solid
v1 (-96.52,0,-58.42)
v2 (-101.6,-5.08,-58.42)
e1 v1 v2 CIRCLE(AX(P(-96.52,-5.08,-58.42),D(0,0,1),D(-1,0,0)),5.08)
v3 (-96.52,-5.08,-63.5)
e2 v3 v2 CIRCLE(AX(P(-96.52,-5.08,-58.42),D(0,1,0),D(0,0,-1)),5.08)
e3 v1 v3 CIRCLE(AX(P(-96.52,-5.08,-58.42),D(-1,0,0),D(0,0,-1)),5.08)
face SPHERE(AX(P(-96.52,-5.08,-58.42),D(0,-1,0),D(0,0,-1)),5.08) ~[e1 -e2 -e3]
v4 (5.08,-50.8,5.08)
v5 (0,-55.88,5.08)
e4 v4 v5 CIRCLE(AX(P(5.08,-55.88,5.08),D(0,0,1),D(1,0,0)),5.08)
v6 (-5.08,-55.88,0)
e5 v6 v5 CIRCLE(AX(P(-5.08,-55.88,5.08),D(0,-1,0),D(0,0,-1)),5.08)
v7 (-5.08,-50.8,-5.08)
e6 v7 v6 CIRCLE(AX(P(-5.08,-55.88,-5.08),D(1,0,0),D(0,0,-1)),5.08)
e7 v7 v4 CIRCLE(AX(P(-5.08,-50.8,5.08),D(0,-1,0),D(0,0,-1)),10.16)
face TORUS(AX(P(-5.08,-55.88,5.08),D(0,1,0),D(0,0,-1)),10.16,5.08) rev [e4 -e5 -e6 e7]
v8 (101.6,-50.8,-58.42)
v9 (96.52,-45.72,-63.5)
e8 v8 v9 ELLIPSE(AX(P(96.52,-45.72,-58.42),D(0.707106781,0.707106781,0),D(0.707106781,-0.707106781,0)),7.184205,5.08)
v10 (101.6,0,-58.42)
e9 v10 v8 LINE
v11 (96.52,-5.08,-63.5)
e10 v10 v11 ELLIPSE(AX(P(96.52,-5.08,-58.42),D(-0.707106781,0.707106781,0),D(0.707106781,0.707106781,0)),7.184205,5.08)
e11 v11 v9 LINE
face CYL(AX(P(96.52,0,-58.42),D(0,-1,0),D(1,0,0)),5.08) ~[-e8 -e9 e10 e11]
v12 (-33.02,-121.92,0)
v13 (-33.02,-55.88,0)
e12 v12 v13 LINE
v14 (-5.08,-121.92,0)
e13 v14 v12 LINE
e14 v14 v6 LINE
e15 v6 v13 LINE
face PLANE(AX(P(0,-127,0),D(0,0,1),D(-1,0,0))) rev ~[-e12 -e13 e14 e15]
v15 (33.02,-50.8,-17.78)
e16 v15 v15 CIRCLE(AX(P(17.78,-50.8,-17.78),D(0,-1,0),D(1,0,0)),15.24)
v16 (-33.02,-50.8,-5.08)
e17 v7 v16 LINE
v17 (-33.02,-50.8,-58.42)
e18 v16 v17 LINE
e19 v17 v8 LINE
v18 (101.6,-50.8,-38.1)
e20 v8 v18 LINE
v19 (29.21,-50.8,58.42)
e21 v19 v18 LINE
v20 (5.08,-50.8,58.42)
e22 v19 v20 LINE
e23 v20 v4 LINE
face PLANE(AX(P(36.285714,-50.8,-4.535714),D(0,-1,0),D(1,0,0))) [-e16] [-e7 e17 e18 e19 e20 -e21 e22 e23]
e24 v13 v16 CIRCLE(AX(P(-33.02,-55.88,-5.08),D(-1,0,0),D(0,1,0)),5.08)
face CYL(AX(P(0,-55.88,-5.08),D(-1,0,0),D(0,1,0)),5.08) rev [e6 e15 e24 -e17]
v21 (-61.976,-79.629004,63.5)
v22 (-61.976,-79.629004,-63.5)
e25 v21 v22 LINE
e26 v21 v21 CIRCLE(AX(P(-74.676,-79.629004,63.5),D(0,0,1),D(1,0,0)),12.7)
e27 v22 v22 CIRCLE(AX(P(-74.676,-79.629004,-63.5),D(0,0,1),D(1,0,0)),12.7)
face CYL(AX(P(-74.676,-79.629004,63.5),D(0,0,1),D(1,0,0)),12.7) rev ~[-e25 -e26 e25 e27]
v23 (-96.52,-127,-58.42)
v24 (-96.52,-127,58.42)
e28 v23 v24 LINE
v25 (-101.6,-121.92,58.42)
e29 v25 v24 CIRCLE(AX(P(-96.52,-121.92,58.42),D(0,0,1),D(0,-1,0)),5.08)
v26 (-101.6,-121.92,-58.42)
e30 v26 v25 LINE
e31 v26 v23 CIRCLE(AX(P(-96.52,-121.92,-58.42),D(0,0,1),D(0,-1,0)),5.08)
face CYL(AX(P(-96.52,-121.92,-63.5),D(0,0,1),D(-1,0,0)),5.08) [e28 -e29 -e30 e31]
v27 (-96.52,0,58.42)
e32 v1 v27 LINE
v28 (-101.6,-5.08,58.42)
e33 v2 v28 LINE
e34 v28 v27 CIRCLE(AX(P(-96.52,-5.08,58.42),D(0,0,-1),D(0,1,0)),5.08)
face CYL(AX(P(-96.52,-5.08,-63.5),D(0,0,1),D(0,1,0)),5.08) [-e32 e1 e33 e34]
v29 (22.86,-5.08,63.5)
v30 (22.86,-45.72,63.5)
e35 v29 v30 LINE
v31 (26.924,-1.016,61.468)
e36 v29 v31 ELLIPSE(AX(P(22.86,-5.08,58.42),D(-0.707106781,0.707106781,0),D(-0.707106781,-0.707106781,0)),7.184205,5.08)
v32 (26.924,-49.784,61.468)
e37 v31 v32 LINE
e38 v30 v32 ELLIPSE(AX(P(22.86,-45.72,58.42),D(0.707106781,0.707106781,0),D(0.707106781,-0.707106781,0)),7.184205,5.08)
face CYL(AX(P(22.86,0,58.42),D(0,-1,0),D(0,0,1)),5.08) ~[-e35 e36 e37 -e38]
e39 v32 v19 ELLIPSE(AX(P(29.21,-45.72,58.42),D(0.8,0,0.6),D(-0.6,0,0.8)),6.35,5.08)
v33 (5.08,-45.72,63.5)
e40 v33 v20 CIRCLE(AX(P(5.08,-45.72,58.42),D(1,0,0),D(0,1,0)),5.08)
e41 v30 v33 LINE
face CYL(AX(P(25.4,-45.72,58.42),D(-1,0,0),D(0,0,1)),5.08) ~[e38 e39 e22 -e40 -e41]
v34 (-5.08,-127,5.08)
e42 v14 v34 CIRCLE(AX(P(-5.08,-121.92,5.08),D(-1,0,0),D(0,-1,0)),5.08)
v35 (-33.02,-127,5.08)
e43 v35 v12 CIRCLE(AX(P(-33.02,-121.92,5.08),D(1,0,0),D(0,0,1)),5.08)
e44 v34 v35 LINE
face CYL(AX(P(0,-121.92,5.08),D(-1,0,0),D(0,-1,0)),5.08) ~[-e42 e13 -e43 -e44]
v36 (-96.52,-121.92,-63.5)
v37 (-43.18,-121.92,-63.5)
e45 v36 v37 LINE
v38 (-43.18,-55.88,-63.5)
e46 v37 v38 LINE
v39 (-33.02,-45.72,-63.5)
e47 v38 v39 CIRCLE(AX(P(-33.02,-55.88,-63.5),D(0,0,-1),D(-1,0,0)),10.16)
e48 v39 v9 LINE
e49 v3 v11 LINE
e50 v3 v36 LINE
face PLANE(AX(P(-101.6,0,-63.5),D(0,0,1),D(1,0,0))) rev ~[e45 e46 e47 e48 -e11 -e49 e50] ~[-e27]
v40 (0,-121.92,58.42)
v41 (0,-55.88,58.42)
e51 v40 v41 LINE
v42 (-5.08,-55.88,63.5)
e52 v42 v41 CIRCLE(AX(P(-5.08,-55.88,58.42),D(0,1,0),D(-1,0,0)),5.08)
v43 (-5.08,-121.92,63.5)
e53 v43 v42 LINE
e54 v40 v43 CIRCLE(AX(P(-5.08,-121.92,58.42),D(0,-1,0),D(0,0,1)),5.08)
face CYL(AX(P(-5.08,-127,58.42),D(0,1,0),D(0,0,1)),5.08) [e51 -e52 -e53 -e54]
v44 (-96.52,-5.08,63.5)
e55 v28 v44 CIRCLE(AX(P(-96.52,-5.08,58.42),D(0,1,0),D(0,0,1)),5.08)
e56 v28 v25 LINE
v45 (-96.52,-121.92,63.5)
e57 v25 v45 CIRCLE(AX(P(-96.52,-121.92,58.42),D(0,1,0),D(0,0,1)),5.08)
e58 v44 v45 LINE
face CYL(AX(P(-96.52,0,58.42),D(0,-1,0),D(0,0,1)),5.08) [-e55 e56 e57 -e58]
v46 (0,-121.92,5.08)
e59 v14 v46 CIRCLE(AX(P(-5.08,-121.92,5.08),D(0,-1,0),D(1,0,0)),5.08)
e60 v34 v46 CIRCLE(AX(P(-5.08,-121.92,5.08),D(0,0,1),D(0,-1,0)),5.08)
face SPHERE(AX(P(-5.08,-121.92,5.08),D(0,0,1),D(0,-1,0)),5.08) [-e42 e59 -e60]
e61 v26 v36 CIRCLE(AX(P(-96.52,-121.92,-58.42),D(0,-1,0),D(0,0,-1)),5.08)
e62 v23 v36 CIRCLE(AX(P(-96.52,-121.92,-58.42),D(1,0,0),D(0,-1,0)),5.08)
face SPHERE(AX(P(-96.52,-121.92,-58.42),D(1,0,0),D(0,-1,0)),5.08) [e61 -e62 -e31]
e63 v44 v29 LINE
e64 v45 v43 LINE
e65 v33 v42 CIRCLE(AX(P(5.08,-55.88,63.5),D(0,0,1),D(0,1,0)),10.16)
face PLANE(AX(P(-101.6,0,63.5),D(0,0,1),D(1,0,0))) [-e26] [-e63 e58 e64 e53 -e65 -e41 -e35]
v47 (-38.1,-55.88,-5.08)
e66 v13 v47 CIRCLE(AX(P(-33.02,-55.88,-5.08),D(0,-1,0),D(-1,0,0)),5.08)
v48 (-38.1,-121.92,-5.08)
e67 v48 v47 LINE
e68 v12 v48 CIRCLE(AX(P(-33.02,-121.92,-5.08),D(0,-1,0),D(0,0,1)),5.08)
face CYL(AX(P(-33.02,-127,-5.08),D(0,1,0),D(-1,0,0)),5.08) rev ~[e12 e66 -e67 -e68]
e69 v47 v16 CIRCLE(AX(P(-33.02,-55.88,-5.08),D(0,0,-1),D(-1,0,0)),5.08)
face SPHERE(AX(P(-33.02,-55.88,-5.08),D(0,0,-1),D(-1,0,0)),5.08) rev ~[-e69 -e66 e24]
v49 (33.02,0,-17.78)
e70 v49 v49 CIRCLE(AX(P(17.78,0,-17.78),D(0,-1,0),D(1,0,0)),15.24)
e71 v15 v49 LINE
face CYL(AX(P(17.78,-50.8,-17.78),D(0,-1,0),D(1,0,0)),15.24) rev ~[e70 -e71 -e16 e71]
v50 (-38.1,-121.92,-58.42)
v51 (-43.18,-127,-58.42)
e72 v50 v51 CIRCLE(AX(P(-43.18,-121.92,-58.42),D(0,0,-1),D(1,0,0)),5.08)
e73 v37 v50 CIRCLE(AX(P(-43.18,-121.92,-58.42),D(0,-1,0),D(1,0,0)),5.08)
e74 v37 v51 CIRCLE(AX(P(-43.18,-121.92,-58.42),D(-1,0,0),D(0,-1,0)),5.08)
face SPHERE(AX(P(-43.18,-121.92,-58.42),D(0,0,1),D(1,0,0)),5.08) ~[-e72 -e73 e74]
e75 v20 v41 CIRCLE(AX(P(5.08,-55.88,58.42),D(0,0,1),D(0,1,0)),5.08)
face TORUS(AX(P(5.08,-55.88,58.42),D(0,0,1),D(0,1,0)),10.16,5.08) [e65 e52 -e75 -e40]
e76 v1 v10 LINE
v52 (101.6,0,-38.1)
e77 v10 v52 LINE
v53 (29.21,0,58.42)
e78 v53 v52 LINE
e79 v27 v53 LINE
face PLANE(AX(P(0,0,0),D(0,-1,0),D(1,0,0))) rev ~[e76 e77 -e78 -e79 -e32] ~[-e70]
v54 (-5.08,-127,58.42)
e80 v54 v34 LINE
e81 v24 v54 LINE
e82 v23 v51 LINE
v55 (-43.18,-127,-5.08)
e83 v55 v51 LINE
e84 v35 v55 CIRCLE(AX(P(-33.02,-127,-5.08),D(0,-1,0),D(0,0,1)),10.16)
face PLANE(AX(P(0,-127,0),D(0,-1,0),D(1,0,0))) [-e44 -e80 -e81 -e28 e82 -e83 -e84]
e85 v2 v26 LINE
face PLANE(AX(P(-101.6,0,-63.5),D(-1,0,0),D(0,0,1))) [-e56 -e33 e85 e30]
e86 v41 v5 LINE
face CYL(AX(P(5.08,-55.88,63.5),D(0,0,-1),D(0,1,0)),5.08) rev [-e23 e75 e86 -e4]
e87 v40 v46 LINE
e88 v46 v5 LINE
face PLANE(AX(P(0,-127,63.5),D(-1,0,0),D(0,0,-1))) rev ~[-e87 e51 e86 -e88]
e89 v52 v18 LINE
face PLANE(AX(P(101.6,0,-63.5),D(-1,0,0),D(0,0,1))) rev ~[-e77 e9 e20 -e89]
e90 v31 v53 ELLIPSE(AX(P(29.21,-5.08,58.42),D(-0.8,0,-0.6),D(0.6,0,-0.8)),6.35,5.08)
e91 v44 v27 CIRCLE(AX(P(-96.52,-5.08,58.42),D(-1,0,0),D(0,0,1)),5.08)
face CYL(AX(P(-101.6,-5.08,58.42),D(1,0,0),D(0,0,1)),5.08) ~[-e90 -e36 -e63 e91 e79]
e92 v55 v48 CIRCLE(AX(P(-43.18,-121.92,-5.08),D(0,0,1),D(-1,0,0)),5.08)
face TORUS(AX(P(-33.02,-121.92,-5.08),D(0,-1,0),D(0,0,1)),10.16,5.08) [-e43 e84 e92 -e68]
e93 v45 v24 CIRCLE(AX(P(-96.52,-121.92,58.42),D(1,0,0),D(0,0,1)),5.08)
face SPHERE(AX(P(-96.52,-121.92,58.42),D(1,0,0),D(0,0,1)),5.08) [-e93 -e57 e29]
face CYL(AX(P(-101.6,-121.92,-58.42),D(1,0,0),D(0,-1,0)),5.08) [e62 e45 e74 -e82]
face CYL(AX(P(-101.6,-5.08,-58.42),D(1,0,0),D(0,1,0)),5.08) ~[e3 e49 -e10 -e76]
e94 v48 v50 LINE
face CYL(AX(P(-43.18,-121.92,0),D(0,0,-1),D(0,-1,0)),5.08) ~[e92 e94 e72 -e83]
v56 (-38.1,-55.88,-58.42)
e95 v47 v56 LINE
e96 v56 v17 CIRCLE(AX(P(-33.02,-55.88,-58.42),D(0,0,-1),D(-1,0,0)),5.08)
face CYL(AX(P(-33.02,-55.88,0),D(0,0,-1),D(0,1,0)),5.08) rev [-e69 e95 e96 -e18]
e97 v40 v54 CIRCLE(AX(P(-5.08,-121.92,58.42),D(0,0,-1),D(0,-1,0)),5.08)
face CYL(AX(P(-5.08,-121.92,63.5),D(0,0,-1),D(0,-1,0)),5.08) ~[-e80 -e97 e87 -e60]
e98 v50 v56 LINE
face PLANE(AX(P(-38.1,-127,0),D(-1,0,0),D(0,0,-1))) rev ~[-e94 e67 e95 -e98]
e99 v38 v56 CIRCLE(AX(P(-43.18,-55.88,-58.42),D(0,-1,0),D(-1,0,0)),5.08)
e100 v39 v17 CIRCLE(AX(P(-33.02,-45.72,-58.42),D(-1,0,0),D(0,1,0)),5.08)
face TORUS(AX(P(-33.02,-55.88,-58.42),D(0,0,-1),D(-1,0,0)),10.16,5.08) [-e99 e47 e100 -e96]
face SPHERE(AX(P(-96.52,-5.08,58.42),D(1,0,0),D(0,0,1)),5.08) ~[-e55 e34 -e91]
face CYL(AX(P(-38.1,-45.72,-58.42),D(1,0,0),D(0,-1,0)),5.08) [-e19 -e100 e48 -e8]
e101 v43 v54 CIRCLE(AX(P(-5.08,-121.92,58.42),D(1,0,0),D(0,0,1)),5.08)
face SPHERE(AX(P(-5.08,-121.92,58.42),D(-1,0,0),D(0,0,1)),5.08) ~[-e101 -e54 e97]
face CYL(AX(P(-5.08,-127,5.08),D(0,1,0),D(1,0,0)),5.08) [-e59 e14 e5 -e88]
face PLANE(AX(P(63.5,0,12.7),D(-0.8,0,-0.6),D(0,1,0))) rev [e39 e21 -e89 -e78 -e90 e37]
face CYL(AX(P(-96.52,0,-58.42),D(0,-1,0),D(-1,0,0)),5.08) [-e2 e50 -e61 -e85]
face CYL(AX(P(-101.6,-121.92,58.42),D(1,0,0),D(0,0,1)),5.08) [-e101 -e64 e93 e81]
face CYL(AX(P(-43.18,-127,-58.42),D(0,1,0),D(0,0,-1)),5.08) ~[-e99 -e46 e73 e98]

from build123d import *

# Parameters (mm, degrees)
F0_W     = 203.2
F0_H     = 127
F1_DEPTH = 127
F3_DEPTH = 76.2
F4_SIZE2 = 101.6
F4_SIZE  = 76.2
F5_R     = 5.08
F6_R     = 15.24
F7_DEPTH = 50.8
F8_R     = 12.7
F9_DEPTH = 127


with BuildPart() as f1:
    # F0 (on Front) → F1 (new body)
    with BuildSketch(Plane.XZ):
        Rectangle(F0_W, F0_H)
    extrude(amount=F1_DEPTH)

    # F2 (on face) → F3 (cut)
    with BuildSketch(Plane.XZ.offset(127)):
        Polygon((-38.1, 0), (-38.1, -63.5), (101.6, -63.5), (101.6, 63.5), (0, 63.5), (0, 0), align=None)
    extrude(amount=-F3_DEPTH, mode=Mode.SUBTRACT)

    # F4
    f4_edges = [f1.edges().sort_by_distance(p)[0] for p in [
        (101.6, -25.4, 63.5),
    ]]
    f4_side = f1.faces().sort_by_distance((-21.771429, -52.614286, 63.5))[0]
    chamfer(f4_edges, length=F4_SIZE, length2=F4_SIZE2, reference=f4_side)

    # F5
    f5_edges = [f1.edges().sort_by_distance(p)[0] for p in [
        (-50.8, -127, 63.5),
        (0, -88.9, 63.5),
        (0, -50.8, 31.75),
        (25.4, -25.4, 63.5),
        (-38.1, 0, 63.5),
        (-101.6, -63.5, 63.5),
        (0, -127, 31.75),
        (-19.05, -127, 0),
        (0, -88.9, 0),
        (-38.1, -127, -31.75),
        (-38.1, -50.8, -31.75),
        (-38.1, -88.9, -63.5),
        (-69.85, -127, -63.5),
        (-101.6, -127, 0),
        (-38.1, -88.9, 0),
        (-101.6, -63.5, -63.5),
        (0, 0, -63.5),
        (101.6, -25.4, -63.5),
        (-101.6, 0, 0),
        (31.75, -50.8, -63.5),
        (12.7, -50.8, 63.5),
        (-19.05, -50.8, 0),
    ]]
    fillet(f5_edges, radius=F5_R)

    # F6 (on face) → F7 (cut, through all)
    with BuildSketch(Plane.XZ.offset(50.8)):
        with Locations((17.78, -17.78)):
            Circle(F6_R)
    extrude(amount=-F7_DEPTH, mode=Mode.SUBTRACT)

    # F8 (on face) → F9 (cut, through all)
    with BuildSketch(Plane.XY.offset(63.5)):
        with Locations((-74.6759995818, -79.6290040016)):
            Circle(F8_R)
    extrude(amount=-F9_DEPTH, mode=Mode.SUBTRACT)


solid = f1.part
